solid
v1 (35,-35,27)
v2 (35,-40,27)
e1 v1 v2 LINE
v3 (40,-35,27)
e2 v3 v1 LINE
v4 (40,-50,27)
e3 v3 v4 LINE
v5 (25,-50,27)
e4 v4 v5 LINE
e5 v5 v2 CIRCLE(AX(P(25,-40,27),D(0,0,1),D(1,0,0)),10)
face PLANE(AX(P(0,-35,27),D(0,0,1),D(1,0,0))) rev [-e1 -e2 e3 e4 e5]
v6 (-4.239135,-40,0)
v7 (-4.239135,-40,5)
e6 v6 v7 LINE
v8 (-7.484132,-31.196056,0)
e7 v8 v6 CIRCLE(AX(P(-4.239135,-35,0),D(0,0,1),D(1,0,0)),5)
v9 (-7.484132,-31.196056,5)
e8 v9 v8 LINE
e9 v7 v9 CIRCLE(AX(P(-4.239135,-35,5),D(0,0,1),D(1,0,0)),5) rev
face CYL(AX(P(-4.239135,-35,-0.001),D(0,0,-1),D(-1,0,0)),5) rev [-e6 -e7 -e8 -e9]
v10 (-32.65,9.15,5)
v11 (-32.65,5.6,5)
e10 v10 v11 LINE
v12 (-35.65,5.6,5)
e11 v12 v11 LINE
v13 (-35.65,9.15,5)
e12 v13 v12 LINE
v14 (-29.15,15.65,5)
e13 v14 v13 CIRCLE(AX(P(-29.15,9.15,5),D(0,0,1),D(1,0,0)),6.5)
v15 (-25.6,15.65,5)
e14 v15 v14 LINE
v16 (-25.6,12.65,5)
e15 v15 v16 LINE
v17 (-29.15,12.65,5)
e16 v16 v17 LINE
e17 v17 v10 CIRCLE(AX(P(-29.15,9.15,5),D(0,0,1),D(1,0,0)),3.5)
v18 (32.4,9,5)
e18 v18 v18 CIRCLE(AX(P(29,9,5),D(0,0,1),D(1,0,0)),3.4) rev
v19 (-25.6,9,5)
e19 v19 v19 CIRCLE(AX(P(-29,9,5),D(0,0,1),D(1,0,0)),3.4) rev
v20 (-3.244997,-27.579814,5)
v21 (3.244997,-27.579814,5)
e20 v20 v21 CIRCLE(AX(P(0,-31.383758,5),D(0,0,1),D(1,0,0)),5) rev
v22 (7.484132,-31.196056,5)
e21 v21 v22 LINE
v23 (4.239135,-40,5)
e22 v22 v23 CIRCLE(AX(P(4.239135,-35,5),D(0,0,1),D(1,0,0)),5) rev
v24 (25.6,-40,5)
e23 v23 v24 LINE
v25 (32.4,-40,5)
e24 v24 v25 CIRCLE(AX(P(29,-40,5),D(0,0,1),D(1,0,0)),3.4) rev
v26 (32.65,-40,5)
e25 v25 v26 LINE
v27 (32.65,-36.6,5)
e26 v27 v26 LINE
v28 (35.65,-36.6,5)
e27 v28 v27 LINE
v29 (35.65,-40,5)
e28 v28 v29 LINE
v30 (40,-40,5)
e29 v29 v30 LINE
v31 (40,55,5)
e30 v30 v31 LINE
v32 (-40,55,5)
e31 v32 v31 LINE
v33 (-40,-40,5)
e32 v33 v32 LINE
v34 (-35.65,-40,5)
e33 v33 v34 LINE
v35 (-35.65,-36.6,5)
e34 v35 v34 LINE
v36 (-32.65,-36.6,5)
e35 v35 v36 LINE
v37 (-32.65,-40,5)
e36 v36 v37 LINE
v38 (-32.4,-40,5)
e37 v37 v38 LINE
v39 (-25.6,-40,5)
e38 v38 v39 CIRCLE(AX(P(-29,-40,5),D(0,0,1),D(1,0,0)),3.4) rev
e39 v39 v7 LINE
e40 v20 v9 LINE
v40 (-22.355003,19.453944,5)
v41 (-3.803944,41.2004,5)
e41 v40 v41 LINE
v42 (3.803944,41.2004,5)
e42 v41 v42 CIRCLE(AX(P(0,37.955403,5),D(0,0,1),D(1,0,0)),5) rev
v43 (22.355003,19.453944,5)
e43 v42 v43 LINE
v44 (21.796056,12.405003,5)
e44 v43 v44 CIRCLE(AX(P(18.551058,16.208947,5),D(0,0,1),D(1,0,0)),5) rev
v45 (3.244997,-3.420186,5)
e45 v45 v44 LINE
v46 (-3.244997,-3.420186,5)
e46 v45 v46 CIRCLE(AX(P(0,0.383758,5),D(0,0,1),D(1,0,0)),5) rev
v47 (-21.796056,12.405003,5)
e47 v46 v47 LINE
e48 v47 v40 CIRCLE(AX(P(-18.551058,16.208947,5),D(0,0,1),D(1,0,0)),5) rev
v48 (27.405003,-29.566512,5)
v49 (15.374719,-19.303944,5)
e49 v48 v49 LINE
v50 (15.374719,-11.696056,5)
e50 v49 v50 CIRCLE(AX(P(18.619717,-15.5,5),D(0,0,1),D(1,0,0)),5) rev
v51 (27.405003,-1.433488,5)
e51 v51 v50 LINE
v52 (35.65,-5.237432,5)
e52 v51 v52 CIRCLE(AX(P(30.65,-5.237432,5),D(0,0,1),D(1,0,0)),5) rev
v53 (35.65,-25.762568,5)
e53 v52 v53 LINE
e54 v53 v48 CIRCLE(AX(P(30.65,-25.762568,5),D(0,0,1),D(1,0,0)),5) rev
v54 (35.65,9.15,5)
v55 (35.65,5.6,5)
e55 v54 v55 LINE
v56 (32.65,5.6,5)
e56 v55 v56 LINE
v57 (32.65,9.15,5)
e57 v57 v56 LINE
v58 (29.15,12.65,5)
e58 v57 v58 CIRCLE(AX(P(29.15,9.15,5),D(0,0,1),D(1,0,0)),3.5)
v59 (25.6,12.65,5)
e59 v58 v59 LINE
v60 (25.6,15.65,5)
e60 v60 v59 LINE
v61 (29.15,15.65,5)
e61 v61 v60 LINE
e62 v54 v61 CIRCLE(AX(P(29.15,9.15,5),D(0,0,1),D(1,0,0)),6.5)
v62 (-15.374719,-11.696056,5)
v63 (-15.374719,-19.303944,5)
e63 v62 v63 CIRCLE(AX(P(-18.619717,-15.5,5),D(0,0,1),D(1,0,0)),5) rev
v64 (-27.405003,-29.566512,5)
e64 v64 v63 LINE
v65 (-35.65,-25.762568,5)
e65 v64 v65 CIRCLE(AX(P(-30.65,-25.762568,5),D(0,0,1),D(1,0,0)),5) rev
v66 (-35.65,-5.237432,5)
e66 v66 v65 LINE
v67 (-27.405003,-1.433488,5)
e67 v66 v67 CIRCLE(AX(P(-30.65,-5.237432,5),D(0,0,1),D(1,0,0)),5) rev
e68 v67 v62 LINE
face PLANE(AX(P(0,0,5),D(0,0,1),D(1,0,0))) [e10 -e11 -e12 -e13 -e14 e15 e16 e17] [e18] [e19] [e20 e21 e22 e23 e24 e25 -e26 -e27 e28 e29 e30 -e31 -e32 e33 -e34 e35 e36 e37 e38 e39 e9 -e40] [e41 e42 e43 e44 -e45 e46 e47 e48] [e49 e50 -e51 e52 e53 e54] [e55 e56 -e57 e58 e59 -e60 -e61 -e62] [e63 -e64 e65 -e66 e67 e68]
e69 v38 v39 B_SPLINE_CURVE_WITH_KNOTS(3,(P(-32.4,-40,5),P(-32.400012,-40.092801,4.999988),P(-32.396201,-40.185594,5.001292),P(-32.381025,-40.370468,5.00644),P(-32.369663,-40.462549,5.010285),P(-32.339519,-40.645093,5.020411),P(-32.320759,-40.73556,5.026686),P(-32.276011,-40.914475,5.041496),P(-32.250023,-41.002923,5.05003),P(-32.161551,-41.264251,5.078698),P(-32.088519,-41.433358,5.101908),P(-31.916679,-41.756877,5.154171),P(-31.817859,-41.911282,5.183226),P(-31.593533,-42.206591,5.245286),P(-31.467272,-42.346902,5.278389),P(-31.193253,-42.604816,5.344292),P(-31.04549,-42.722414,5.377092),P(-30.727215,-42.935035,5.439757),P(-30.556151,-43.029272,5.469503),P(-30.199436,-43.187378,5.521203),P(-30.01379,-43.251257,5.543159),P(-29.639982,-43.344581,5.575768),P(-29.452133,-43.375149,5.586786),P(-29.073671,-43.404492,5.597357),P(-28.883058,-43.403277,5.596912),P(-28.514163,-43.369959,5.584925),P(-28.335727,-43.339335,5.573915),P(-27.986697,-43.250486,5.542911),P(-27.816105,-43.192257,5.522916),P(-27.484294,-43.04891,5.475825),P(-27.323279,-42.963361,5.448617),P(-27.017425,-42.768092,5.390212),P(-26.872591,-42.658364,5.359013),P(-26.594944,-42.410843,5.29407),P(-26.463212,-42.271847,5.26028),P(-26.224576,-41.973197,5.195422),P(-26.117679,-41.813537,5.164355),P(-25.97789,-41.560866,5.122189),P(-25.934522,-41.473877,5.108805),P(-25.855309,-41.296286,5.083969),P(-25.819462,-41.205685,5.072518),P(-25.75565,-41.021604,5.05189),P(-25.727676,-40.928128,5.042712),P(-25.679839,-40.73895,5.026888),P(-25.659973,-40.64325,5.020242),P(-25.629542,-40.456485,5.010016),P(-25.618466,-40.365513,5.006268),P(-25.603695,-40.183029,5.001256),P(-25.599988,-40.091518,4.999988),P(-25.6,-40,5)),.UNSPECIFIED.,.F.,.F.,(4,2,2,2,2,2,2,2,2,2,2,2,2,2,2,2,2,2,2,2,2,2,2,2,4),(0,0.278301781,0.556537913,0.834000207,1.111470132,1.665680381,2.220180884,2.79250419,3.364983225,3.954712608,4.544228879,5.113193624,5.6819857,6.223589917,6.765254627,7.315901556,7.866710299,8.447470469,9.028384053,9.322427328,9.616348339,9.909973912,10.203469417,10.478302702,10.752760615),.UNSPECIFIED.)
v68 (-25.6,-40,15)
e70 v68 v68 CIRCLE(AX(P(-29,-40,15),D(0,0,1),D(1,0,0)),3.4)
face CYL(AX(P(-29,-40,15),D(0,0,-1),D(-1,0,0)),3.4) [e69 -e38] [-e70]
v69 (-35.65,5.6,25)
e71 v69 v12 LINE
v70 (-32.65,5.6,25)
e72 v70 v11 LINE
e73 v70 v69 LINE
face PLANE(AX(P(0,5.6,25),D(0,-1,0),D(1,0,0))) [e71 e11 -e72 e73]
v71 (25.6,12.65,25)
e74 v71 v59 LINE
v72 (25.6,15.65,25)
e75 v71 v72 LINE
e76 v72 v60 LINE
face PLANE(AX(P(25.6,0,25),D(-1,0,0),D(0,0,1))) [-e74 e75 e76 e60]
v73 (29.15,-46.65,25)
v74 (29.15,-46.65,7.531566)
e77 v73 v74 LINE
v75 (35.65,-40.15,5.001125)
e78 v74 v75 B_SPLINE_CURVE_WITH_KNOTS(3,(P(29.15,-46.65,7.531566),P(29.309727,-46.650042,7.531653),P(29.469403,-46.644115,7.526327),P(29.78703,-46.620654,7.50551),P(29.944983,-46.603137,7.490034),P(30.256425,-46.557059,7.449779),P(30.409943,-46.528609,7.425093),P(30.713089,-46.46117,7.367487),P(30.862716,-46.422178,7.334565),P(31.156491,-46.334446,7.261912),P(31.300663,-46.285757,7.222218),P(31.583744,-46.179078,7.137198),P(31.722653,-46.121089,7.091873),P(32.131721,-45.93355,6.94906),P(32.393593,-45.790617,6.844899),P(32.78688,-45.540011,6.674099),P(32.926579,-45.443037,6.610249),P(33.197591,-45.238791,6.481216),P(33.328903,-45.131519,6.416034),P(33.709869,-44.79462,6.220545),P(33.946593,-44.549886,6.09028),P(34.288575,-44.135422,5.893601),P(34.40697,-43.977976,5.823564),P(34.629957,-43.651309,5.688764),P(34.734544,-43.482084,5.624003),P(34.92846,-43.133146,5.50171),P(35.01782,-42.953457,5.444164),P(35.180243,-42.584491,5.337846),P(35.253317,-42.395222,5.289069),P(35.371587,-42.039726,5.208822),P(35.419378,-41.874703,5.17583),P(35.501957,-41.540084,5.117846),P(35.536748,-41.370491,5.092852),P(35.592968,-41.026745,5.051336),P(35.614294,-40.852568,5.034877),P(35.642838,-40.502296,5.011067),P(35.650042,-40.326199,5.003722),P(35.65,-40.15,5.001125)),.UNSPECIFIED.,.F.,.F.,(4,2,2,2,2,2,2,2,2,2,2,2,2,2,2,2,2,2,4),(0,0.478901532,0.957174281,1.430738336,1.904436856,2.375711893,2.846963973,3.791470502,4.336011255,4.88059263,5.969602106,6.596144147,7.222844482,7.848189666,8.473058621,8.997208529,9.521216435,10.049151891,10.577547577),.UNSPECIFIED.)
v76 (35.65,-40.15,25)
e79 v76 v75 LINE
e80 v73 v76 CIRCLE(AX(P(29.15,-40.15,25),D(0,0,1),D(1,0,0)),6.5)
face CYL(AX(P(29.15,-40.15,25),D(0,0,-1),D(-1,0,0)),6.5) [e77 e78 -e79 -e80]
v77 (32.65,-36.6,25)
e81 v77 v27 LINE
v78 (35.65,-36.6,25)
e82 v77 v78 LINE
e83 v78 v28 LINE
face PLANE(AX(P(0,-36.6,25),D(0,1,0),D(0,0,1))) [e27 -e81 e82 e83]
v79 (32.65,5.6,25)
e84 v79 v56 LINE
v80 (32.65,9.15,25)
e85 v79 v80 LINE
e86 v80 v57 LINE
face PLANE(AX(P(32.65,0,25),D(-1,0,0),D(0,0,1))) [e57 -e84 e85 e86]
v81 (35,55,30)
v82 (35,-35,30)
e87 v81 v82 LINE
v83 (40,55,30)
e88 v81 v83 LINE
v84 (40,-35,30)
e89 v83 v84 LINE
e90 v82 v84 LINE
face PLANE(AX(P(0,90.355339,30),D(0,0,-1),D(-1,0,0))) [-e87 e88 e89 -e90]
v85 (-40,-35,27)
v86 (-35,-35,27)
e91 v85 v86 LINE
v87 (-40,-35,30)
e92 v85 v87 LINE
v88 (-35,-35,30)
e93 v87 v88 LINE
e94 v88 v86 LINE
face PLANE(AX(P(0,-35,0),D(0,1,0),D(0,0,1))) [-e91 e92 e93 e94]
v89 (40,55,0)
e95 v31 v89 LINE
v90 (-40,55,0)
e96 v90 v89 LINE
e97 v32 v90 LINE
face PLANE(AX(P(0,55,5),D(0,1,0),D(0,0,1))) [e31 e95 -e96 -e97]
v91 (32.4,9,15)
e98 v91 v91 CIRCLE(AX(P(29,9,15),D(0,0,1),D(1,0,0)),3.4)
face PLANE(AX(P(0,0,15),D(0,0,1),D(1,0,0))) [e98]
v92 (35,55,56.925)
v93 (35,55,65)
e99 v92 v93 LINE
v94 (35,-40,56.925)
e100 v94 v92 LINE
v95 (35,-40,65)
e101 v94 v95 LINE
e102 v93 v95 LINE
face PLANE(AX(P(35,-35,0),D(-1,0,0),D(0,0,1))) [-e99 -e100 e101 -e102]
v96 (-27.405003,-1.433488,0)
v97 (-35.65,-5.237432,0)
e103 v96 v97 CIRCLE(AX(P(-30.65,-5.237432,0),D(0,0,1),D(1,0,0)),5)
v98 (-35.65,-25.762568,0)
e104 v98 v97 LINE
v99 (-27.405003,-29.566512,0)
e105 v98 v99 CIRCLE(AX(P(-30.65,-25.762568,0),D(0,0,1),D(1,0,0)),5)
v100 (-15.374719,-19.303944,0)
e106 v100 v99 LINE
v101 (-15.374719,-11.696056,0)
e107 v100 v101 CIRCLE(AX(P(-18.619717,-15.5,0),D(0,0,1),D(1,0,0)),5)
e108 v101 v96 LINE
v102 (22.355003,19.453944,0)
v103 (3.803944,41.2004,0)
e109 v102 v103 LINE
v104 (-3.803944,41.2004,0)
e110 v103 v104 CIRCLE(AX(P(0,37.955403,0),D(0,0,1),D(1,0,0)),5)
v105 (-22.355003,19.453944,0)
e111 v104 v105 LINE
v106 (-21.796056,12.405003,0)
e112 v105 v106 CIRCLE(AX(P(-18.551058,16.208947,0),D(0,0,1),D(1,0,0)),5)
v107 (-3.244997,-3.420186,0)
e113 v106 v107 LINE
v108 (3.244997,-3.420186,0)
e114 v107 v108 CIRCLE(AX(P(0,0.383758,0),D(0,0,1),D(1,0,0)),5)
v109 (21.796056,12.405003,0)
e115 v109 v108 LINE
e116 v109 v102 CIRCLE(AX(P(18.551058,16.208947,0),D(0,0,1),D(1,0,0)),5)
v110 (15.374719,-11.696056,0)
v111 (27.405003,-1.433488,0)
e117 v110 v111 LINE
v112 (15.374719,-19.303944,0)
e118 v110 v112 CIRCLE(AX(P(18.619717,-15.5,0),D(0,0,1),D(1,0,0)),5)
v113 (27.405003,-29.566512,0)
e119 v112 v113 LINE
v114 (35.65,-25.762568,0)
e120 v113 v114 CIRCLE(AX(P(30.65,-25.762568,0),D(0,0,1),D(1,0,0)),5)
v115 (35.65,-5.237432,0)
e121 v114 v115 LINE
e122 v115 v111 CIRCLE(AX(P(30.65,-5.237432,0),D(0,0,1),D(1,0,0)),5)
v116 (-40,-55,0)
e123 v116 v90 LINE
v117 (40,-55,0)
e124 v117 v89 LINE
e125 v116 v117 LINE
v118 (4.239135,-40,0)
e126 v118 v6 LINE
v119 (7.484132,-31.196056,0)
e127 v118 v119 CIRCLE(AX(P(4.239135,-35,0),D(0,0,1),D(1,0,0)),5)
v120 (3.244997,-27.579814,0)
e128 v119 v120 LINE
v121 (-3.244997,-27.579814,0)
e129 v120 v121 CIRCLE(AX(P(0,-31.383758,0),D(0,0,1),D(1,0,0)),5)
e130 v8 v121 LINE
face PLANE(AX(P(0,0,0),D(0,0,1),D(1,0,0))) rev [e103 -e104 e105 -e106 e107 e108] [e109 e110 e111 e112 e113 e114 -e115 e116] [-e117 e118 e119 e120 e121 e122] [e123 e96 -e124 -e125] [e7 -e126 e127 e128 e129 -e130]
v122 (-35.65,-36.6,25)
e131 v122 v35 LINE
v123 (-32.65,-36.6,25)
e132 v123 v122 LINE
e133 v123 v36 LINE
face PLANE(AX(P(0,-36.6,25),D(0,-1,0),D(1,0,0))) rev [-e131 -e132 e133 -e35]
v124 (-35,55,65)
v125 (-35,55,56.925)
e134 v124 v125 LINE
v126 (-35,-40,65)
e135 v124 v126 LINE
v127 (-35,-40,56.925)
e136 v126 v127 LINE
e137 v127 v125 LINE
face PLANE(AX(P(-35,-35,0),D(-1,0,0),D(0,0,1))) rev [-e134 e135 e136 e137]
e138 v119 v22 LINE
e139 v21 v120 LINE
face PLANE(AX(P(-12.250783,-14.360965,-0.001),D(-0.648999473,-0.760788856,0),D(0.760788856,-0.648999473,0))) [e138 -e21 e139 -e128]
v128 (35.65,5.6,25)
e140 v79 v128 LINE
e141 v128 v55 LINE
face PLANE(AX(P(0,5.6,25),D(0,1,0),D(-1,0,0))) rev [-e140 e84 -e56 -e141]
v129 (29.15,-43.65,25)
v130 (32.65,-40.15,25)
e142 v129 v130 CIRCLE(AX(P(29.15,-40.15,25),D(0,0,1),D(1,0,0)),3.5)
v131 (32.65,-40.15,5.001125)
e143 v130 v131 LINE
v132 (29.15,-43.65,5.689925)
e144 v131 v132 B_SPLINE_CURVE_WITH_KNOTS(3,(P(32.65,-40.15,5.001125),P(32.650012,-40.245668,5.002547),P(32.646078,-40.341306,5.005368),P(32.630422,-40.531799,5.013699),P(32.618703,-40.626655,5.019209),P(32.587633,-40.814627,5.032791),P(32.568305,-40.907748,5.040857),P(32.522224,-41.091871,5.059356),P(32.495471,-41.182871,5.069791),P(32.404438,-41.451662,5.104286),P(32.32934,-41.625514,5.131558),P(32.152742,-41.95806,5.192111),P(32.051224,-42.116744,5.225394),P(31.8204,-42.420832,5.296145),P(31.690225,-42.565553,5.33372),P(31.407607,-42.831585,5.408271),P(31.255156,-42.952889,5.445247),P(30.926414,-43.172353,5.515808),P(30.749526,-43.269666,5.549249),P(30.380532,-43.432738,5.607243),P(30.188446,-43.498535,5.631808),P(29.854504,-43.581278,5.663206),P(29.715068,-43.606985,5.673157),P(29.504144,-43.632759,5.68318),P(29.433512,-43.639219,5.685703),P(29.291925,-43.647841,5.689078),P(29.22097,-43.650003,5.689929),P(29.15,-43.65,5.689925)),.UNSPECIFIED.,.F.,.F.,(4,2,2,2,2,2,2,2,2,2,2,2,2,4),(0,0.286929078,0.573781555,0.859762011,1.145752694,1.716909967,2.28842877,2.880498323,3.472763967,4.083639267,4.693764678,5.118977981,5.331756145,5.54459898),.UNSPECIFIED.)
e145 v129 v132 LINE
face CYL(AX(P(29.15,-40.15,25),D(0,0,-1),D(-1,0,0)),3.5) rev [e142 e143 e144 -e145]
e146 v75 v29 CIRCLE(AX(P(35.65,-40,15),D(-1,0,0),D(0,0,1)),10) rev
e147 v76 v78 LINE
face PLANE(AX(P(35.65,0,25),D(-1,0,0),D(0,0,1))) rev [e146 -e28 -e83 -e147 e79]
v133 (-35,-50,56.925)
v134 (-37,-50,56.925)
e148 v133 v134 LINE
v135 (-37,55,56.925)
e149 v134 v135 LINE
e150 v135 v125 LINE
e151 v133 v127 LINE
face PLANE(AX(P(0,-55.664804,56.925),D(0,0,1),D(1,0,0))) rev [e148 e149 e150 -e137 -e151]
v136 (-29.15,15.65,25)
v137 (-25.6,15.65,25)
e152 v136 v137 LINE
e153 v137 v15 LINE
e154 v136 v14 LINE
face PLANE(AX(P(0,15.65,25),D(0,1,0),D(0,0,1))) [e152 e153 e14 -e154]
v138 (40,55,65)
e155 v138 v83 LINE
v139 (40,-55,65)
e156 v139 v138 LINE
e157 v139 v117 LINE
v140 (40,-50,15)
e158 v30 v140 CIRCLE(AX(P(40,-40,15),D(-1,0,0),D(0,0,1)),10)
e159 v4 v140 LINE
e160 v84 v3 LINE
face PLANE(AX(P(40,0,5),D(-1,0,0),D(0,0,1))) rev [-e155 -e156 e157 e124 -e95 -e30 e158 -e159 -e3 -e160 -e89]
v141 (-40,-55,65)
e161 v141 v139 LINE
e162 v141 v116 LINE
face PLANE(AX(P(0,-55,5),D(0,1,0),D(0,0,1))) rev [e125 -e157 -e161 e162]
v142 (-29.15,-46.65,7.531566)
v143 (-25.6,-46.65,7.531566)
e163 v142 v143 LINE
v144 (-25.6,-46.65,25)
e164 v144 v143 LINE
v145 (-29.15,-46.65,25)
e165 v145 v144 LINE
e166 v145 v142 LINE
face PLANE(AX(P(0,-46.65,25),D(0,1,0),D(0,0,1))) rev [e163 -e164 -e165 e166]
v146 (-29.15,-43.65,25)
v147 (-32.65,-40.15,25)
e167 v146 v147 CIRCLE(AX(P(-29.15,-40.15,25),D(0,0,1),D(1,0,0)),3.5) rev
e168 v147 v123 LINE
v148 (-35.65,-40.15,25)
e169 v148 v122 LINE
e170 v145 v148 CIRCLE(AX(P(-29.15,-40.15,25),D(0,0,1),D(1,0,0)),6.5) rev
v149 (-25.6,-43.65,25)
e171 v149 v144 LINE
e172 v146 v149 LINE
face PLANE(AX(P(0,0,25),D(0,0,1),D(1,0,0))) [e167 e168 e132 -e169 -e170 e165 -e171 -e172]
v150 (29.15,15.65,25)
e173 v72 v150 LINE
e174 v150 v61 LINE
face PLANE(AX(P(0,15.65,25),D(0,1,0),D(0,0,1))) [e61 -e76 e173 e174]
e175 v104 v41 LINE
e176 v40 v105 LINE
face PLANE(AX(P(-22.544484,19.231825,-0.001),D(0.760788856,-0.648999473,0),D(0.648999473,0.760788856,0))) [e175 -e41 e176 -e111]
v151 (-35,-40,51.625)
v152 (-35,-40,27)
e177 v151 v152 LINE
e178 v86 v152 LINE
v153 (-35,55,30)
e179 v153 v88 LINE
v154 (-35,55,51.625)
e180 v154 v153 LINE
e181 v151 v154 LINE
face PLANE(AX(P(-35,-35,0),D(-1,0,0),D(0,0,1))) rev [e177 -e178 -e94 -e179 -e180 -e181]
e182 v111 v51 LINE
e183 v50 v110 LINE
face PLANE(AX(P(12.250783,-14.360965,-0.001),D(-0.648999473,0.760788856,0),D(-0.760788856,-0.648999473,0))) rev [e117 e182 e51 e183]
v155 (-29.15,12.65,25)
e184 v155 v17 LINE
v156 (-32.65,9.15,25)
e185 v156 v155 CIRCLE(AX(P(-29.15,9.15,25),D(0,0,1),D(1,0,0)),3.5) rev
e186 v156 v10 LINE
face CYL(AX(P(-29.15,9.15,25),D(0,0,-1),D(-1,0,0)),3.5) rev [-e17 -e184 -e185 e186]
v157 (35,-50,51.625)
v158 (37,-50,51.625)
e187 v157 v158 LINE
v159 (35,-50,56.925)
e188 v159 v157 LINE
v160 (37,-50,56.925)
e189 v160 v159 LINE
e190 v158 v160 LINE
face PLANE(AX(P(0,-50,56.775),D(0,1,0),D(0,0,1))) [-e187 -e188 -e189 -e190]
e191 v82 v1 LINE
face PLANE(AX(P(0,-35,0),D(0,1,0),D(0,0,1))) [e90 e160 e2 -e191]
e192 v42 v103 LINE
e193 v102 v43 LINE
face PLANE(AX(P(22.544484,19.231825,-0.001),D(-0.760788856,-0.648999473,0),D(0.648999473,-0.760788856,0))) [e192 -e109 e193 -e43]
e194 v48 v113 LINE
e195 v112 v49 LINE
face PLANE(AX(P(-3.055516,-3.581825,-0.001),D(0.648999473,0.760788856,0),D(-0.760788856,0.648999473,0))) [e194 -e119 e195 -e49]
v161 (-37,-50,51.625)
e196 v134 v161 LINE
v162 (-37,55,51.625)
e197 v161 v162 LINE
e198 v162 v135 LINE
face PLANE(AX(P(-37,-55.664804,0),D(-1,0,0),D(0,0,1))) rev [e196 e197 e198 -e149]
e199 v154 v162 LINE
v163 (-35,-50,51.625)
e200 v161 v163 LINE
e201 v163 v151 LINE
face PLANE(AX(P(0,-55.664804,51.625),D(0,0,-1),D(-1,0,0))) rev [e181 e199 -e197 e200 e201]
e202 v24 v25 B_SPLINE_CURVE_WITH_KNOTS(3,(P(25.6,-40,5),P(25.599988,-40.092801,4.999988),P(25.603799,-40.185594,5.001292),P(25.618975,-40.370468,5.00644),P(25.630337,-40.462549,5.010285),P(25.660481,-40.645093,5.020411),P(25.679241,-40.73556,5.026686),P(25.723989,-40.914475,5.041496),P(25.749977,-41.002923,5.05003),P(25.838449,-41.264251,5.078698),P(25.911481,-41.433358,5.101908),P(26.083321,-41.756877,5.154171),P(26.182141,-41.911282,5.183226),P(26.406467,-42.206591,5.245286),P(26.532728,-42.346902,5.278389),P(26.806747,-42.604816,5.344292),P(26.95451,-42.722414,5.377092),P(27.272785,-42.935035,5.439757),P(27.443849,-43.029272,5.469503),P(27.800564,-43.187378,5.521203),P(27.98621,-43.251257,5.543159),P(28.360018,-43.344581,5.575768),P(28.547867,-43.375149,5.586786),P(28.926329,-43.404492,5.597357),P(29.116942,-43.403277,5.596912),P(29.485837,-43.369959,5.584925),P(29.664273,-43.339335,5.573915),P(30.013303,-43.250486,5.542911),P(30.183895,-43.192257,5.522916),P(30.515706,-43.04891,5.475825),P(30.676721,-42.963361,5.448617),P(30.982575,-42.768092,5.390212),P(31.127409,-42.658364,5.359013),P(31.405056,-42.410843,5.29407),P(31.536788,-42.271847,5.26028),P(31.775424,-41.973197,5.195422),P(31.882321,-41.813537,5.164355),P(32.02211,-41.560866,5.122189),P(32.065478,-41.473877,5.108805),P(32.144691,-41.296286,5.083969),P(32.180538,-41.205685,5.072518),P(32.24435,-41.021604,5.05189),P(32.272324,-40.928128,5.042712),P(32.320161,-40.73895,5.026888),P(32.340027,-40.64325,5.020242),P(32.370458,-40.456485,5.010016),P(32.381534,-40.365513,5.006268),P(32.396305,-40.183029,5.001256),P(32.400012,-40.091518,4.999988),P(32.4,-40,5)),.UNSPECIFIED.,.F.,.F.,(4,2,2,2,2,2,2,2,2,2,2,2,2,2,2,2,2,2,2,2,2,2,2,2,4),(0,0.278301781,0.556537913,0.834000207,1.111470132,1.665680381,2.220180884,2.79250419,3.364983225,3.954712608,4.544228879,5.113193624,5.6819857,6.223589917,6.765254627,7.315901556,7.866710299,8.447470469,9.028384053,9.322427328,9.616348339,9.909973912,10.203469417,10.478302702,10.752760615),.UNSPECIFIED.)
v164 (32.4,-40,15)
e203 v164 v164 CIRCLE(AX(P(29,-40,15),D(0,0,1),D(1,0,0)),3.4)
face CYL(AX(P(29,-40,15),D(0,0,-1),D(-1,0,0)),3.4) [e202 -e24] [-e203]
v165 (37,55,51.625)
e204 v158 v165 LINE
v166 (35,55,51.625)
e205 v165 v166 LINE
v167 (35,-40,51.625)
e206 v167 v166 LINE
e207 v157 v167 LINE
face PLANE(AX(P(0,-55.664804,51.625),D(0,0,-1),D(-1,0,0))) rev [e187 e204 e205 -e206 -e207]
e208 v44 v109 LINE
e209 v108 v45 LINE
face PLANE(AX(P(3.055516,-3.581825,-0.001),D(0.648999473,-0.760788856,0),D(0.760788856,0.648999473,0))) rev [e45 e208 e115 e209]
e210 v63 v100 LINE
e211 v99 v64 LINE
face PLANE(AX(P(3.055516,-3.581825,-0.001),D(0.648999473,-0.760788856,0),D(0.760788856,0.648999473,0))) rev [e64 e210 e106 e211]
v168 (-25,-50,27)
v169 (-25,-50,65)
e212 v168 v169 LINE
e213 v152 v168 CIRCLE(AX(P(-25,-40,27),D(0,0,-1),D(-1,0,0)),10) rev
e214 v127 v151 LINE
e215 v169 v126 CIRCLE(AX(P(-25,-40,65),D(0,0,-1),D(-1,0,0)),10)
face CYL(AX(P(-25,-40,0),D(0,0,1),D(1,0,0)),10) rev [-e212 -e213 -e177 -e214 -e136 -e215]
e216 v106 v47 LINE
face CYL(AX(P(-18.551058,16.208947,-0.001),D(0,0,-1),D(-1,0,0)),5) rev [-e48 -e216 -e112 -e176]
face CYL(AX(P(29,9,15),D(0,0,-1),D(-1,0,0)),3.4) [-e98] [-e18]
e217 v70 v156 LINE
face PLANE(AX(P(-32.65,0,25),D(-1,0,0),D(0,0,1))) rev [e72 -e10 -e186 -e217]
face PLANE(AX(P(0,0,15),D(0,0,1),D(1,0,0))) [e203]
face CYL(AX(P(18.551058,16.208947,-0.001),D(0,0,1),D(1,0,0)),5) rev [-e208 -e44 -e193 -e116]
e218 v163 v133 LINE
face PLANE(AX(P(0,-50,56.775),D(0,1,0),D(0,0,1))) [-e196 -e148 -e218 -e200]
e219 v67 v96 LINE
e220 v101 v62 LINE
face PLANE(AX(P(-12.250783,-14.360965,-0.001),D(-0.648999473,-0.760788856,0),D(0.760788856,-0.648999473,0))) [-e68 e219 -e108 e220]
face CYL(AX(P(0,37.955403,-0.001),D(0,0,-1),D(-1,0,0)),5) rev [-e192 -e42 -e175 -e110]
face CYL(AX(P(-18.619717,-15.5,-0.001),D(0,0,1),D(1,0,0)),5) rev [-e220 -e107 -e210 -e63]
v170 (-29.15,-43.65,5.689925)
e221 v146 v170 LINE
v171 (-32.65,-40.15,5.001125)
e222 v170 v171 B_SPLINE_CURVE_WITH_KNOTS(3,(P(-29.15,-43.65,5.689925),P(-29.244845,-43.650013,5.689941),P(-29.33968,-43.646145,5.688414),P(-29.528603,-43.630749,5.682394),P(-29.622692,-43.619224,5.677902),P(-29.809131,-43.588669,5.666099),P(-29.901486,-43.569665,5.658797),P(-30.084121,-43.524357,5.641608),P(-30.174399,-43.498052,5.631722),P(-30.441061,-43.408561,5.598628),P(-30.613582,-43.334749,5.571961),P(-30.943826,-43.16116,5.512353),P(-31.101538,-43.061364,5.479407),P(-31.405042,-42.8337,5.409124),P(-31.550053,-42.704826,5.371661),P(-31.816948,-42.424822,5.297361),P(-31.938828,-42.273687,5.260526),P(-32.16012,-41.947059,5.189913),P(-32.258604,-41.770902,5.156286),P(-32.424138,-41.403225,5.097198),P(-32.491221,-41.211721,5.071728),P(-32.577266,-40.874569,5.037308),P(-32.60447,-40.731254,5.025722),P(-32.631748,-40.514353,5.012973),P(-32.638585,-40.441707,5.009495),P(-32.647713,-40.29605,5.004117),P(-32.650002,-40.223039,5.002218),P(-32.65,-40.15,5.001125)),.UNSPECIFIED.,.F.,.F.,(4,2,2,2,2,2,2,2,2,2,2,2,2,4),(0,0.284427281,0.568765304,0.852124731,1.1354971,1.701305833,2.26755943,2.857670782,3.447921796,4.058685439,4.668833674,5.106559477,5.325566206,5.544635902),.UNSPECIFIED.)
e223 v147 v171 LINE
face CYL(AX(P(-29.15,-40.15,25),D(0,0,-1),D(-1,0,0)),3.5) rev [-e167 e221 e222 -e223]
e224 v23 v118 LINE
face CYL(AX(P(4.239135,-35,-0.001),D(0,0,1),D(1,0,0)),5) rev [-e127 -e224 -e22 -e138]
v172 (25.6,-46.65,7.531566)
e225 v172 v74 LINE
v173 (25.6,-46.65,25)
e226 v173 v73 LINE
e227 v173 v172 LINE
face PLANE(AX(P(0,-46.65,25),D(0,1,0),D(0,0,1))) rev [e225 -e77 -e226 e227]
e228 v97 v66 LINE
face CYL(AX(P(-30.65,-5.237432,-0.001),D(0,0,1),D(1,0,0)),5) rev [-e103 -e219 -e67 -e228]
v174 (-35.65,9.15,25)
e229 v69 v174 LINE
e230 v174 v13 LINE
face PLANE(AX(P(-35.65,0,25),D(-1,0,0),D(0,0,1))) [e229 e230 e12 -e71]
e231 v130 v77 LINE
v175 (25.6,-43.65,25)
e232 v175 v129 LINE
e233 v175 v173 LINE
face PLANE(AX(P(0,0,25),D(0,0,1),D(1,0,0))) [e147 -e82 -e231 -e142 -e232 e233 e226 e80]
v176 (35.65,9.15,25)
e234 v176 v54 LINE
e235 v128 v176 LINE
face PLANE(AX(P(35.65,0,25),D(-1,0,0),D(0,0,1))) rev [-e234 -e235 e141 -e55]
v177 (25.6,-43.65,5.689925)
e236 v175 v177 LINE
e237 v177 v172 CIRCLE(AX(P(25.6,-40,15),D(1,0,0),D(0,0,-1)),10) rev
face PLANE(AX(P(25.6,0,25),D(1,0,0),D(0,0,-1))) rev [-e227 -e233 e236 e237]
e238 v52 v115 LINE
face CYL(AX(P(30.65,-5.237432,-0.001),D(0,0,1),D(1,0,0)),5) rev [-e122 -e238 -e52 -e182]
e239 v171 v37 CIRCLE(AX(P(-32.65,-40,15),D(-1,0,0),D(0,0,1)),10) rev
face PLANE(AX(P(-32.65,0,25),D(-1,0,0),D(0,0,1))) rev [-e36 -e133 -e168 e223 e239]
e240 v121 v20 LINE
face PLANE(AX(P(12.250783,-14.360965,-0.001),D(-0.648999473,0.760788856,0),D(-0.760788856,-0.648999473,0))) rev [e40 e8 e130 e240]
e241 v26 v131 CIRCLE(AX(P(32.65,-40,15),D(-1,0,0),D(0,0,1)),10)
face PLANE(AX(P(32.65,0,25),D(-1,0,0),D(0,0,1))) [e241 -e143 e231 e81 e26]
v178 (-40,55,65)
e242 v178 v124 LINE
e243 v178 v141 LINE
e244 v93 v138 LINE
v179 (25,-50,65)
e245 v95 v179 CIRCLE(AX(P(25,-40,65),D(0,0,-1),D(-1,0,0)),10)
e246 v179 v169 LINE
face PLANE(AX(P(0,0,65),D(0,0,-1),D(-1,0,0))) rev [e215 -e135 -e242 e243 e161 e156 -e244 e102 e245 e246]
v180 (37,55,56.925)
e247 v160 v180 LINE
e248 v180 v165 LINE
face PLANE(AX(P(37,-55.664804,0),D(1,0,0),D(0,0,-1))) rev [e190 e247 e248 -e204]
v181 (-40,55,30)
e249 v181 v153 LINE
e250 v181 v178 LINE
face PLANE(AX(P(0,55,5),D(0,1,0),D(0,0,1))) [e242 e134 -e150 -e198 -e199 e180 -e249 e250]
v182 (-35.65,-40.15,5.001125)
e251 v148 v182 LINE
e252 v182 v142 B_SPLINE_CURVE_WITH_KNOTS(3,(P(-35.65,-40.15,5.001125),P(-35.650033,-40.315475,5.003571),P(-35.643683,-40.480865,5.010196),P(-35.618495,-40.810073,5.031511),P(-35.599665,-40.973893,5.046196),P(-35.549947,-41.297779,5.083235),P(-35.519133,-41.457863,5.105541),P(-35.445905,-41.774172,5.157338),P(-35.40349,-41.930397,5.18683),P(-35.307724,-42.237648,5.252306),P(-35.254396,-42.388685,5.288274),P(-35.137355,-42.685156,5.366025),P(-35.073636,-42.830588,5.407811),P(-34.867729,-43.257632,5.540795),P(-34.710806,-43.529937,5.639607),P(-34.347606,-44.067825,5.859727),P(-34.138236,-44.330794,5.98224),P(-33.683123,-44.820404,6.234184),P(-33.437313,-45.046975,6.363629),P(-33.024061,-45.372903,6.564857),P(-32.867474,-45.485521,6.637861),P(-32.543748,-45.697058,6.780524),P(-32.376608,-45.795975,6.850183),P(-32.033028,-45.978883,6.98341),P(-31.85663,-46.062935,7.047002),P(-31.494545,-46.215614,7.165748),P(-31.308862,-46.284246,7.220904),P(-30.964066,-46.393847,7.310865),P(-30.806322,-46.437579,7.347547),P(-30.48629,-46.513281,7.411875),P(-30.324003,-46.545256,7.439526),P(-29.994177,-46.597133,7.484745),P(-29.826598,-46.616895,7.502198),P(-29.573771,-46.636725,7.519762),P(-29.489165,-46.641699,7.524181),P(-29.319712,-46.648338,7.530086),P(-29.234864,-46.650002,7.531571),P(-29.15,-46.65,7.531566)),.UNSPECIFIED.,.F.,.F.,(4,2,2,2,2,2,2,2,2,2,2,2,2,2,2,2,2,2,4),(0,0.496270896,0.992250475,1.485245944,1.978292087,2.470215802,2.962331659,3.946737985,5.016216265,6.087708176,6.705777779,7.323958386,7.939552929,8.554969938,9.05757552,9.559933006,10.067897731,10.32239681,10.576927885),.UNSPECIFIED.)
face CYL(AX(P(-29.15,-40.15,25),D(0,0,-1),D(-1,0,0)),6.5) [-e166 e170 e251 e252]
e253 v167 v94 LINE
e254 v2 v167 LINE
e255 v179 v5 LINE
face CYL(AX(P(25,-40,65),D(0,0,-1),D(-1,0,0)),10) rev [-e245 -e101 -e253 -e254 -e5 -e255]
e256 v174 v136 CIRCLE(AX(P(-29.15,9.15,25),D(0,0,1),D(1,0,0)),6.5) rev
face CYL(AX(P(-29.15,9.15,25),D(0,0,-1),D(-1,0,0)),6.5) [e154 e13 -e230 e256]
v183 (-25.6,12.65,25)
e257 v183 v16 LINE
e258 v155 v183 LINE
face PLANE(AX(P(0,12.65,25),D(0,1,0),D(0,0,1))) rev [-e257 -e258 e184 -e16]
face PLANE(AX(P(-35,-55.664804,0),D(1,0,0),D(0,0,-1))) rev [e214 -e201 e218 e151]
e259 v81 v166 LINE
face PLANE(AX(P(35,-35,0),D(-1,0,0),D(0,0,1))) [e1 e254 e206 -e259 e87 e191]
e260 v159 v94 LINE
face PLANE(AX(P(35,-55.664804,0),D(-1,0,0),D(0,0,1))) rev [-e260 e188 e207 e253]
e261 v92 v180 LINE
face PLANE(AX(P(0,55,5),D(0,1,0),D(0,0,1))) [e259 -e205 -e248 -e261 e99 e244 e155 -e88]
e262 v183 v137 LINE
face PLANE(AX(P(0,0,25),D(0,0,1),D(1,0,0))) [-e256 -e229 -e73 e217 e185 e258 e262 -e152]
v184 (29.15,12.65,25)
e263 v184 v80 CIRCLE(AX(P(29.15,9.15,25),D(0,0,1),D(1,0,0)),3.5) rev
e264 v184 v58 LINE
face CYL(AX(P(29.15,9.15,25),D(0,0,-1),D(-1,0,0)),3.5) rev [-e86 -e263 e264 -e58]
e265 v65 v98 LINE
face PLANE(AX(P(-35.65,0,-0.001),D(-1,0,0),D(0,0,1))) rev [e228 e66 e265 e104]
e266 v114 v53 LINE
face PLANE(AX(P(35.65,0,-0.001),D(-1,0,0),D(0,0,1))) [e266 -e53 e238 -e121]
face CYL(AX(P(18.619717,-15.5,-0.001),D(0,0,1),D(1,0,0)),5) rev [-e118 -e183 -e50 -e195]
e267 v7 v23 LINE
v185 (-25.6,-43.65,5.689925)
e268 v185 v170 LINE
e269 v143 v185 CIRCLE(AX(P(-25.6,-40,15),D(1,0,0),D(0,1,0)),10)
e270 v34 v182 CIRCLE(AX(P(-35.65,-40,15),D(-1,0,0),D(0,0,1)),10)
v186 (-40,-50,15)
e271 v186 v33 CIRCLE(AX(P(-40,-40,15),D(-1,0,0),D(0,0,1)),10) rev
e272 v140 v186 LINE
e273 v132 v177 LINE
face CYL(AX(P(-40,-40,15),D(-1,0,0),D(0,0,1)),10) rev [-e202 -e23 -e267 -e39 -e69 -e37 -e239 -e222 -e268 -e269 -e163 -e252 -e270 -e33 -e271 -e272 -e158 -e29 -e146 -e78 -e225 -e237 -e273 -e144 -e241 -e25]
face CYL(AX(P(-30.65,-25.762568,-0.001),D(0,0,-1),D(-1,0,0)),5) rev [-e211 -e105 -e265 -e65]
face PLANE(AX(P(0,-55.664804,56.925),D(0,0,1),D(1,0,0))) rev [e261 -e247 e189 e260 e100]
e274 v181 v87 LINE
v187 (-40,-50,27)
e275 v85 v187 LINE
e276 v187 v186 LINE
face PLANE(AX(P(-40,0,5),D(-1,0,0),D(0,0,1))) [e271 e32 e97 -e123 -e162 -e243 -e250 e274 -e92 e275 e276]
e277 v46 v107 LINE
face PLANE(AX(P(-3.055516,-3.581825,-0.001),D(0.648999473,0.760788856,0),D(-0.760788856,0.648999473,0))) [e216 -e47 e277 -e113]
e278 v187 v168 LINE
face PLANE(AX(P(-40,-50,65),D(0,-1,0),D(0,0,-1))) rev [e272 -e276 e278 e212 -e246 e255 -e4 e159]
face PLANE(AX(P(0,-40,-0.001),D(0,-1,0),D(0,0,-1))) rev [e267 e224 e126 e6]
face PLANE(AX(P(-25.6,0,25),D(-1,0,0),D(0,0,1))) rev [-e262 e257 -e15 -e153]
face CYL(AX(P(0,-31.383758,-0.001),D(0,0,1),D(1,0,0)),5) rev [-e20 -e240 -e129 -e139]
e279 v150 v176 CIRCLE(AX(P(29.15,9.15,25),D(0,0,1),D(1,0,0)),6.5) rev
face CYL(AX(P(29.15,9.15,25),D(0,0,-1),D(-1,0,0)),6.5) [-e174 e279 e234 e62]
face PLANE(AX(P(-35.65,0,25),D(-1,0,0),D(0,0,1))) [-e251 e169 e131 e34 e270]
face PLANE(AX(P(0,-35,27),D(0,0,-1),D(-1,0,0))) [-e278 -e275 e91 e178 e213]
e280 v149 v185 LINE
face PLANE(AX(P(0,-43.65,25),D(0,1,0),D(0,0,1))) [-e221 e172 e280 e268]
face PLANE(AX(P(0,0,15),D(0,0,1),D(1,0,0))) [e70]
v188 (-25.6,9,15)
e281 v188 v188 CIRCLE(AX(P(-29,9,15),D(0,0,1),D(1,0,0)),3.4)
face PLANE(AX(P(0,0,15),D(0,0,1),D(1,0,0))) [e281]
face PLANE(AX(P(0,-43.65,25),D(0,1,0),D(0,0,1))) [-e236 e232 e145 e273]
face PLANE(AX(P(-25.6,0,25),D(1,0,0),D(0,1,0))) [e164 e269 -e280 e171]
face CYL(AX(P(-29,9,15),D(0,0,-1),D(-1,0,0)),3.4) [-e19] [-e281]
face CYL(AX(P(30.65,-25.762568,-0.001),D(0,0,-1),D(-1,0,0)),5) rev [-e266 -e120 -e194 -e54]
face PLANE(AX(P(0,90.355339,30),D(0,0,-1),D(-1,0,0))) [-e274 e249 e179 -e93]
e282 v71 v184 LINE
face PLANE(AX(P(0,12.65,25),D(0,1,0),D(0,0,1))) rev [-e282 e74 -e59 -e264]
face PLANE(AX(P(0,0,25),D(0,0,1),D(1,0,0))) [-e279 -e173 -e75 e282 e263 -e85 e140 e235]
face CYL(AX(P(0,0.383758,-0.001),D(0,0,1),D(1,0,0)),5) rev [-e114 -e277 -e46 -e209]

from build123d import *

# Parameters (mm, degrees)
SKETCH1_W           = 80
SKETCH1_H           = 110
BOSS_EXTRUDE1_DEPTH = 5
SKETCH1_3_R         = 3.4
BOSS_EXTRUDE3_DEPTH = 15
BOSS_EXTRUDE4_DEPTH = 25
SKETCH2_W           = 80
SKETCH2_H           = 5
BOSS_EXTRUDE5_DEPTH = 60
SKETCH3_W           = 5
SKETCH3_H           = 38
BOSS_EXTRUDE6_DEPTH = 15
SKETCH4_W           = 5
SKETCH4_H           = 35
BOSS_EXTRUDE7_DEPTH = 90
FILLET1_R           = 10
CUT_EXTRUDE1_START  = -105
SKETCH5_W           = 2
SKETCH5_H           = 5.3
CUT_EXTRUDE1_DEPTH  = 105
CUT_EXTRUDE2_REACH  = 92.692
FILLET2_R           = 5


with BuildPart() as part:
    # Sketch1 → Boss-Extrude1 (new body)
    with BuildSketch(Plane.XY):
        Rectangle(SKETCH1_W, SKETCH1_H)
    extrude(amount=BOSS_EXTRUDE1_DEPTH)

    # Sketch1<3> → Boss-Extrude3 (add)
    with BuildSketch(Plane.XY):
        with Locations((-29, 9)):
            Circle(SKETCH1_3_R)
        with Locations((29, 9)):
            Circle(SKETCH1_3_R)
        with Locations((29, -40)):
            Circle(SKETCH1_3_R)
        with Locations((-29, -40)):
            Circle(SKETCH1_3_R)
    extrude(amount=BOSS_EXTRUDE3_DEPTH)

    # Sketch1<4> → Boss-Extrude4 (add)
    with BuildSketch(Plane.XY):
        with BuildLine():
            Line((-25.6, 15.65), (-29.15, 15.65))
            ThreePointArc((-29.15, 15.65), (-33.746194078, 13.746194078), (-35.65, 9.15))
            Line((-35.65, 9.15), (-35.65, 5.6))
            Line((-35.65, 5.6), (-32.65, 5.6))
            Line((-32.65, 5.6), (-32.65, 9.15))
            ThreePointArc((-32.65, 9.15), (-31.624873734, 11.624873734), (-29.15, 12.65))
            Line((-29.15, 12.65), (-25.6, 12.65))
            Line((-25.6, 12.65), (-25.6, 15.65))
        make_face()
        with BuildLine():
            Line((29.15, 15.65), (25.6, 15.65))
            Line((25.6, 15.65), (25.6, 12.65))
            Line((25.6, 12.65), (29.15, 12.65))
            ThreePointArc((29.15, 12.65), (31.624873734, 11.624873734), (32.65, 9.15))
            Line((32.65, 9.15), (32.65, 5.6))
            Line((32.65, 5.6), (35.65, 5.6))
            Line((35.65, 5.6), (35.65, 9.15))
            ThreePointArc((35.65, 9.15), (33.746194078, 13.746194078), (29.15, 15.65))
        make_face()
        with BuildLine():
            Line((35.65, -40.15), (35.65, -36.6))
            Line((35.65, -36.6), (32.65, -36.6))
            Line((32.65, -36.6), (32.65, -40.15))
            ThreePointArc((32.65, -40.15), (31.624873734, -42.624873734), (29.15, -43.65))
            Line((29.15, -43.65), (25.6, -43.65))
            Line((25.6, -43.65), (25.6, -46.65))
            Line((25.6, -46.65), (29.15, -46.65))
            ThreePointArc((29.15, -46.65), (33.746194078, -44.746194078), (35.65, -40.15))
        make_face()
        with BuildLine():
            Line((-32.65, -36.6), (-35.65, -36.6))
            Line((-35.65, -36.6), (-35.65, -40.15))
            ThreePointArc((-35.65, -40.15), (-33.746194078, -44.746194078), (-29.15, -46.65))
            Line((-29.15, -46.65), (-25.6, -46.65))
            Line((-25.6, -46.65), (-25.6, -43.65))
            Line((-25.6, -43.65), (-29.15, -43.65))
            ThreePointArc((-29.15, -43.65), (-31.624873734, -42.624873734), (-32.65, -40.15))
            Line((-32.65, -40.15), (-32.65, -36.6))
        make_face()
    extrude(amount=BOSS_EXTRUDE4_DEPTH)

    # Sketch2 → Boss-Extrude5 (add)
    with BuildSketch(Plane.XY.offset(5)):
        with Locations((0, -52.5)):
            Rectangle(SKETCH2_W, SKETCH2_H)
    extrude(amount=BOSS_EXTRUDE5_DEPTH)

    # Sketch3 → Boss-Extrude6 (add)
    with BuildSketch(Plane(origin=(0, -50, 0), x_dir=(1, 0, 0), z_dir=(0, 1, 0))):
        with Locations((-37.5, -46)):
            Rectangle(SKETCH3_W, SKETCH3_H)
        with Locations((37.5, -46)):
            Rectangle(SKETCH3_W, SKETCH3_H)
    extrude(amount=BOSS_EXTRUDE6_DEPTH)

    # Sketch4 → Boss-Extrude7 (add)
    with BuildSketch(Plane(origin=(0, -35, 0), x_dir=(1, 0, 0), z_dir=(0, 1, 0))):
        with Locations((-37.5, -47.5)):
            Rectangle(SKETCH4_W, SKETCH4_H)
        with Locations((37.5, -47.5)):
            Rectangle(SKETCH4_W, SKETCH4_H)
    extrude(amount=BOSS_EXTRUDE7_DEPTH)

    # Fillet1
    # the kernel refuses this fillet: 10 mm, written as the material it adds along each edge
    with BuildSketch(Plane(origin=(-35, -50, 65), x_dir=(1, 0, 0), z_dir=(0, 0, -1)), Plane(origin=(35, -50, 27), x_dir=(-1, 0, 0), z_dir=(0, 0, 1))) as fillet1_piece_1:
        with BuildLine():
            CenterArc((FILLET1_R, -FILLET1_R), FILLET1_R, 90, 90)
            Line((0, -FILLET1_R), (0, 0))
            Line((0, 0), (FILLET1_R, 0))
        make_face()
    extrude(amount=38)
    with BuildSketch(Plane(origin=(40, -50, 5), x_dir=(0, 1, 0), z_dir=(-1, 0, 0))) as fillet1_piece_2:
        with BuildLine():
            CenterArc((FILLET1_R, -FILLET1_R), FILLET1_R, 90, 90)
            Line((0, -FILLET1_R), (0, 0))
            Line((0, 0), (FILLET1_R, 0))
        make_face()
    extrude(amount=80)

    # Sketch5 → Cut-Extrude1 (cut)
    with BuildSketch(Plane(origin=(0, 55, 0), x_dir=(1, 0, 0), z_dir=(0, 1, 0)).offset(CUT_EXTRUDE1_START)):
        with Locations((-36, -54.275)):
            Rectangle(SKETCH5_W, SKETCH5_H)
        with Locations((36, -54.275)):
            Rectangle(SKETCH5_W, SKETCH5_H)
    extrude(amount=CUT_EXTRUDE1_DEPTH, mode=Mode.SUBTRACT)

    # Sketch6 → Cut-Extrude2 (cut, up to next)
    with BuildSketch(Plane.XY.offset(5), mode=Mode.PRIVATE) as cut_extrude2_sk1:
        Polygon((0, 45.659569378), (25.6, 15.65), (-25.6, 15.65), align=None)
    cut_extrude2_tool1 = extrude(cut_extrude2_sk1.sketch, amount=-CUT_EXTRUDE2_REACH, mode=Mode.PRIVATE) & part.part
    # Sketch6 → Cut-Extrude2 (cut, up to next)
    with BuildSketch(Plane.XY.offset(5), mode=Mode.PRIVATE) as cut_extrude2_sk2:
        Polygon((-25.6, 15.65), (0, -6.188367347), (25.6, 15.65), align=None)
    cut_extrude2_tool2 = extrude(cut_extrude2_sk2.sketch, amount=-CUT_EXTRUDE2_REACH, mode=Mode.PRIVATE) & part.part
    # Sketch6 → Cut-Extrude2 (cut, up to next)
    with BuildSketch(Plane.XY.offset(5), mode=Mode.PRIVATE) as cut_extrude2_sk3:
        Polygon((-35.65, -36.6), (-10.915550239, -15.5), (-35.65, 5.6), align=None)
    cut_extrude2_tool3 = extrude(cut_extrude2_sk3.sketch, amount=-CUT_EXTRUDE2_REACH, mode=Mode.PRIVATE) & part.part
    # Sketch6 → Cut-Extrude2 (cut, up to next)
    with BuildSketch(Plane.XY.offset(5), mode=Mode.PRIVATE) as cut_extrude2_sk4:
        Polygon((-17.804545455, -40), (17.804545455, -40), (0, -24.811632653), align=None)
    cut_extrude2_tool4 = extrude(cut_extrude2_sk4.sketch, amount=-CUT_EXTRUDE2_REACH, mode=Mode.PRIVATE) & part.part
    # Sketch6 → Cut-Extrude2 (cut, up to next)
    with BuildSketch(Plane.XY.offset(5), mode=Mode.PRIVATE) as cut_extrude2_sk5:
        Polygon((10.915550239, -15.5), (35.65, -36.6), (35.65, 5.6), align=None)
    cut_extrude2_tool5 = extrude(cut_extrude2_sk5.sketch, amount=-CUT_EXTRUDE2_REACH, mode=Mode.PRIVATE) & part.part
    add(cut_extrude2_tool1.solids().sort_by_distance((0, 25.65319, 5))[0], mode=Mode.SUBTRACT)
    add(cut_extrude2_tool2.solids().sort_by_distance((0, 8.370544, 5))[0], mode=Mode.SUBTRACT)
    add(cut_extrude2_tool3.solids().sort_by_distance((-27.405183, -15.5, 5))[0], mode=Mode.SUBTRACT)
    add(cut_extrude2_tool4.solids().sort_by_distance((0, -34.937211, 5))[0], mode=Mode.SUBTRACT)
    add(cut_extrude2_tool5.solids().sort_by_distance((27.405183, -15.5, 5))[0], mode=Mode.SUBTRACT)

    # Fillet2
    # the kernel refuses this fillet: 5 mm, written as the material it adds along each edge
    with BuildSketch(Plane(origin=(17.804545455, -40, 5), x_dir=(-1, 0, 0), z_dir=(0, 0, -1))) as fillet2_piece_1:
        with BuildLine():
            CenterArc((FILLET2_R * 2.71308210373, FILLET2_R), FILLET2_R, 130.466208854, 139.533791146)
            Line((FILLET2_R * 2.06408263048, FILLET2_R * 1.7607888562), (0, 0))
            Line((0, 0), (FILLET2_R * 2.71308210373, 0))
        make_face()
    extrude(amount=5)
    with BuildSketch(Plane(origin=(0, -24.811632653, 5), x_dir=(0.7607888562020934, -0.6489994732499483, 0), z_dir=(0, 0, -1)), Plane(origin=(0, -6.188367347, 5), x_dir=(-0.7607888562020926, 0.6489994732499494, 0), z_dir=(0, 0, -1))) as fillet2_piece_2:
        with BuildLine():
            CenterArc((FILLET2_R * 0.85306122449, FILLET2_R), FILLET2_R, 189.067582292, 80.932417708)
            Line((-FILLET2_R * 0.134441909369, FILLET2_R * 0.842400632557), (0, 0))
            Line((0, 0), (FILLET2_R * 0.85306122449, 0))
        make_face()
    extrude(amount=5)
    with BuildSketch(Plane(origin=(-17.804545455, -40, 5), x_dir=(1, 0, 0), z_dir=(0, 0, -1))) as fillet2_piece_3:
        with BuildLine():
            CenterArc((FILLET2_R * 2.71308210373, -FILLET2_R), FILLET2_R, 90, 139.533791146)
            Line((FILLET2_R * 2.06408263048, -FILLET2_R * 1.7607888562), (0, 0))
            Line((0, 0), (FILLET2_R * 2.71308210373, 0))
        make_face()
    extrude(amount=5)
    with BuildSketch(Plane(origin=(-35.65, 5.6, 5), x_dir=(0, -1, 0), z_dir=(0, 0, -1)), Plane(origin=(35.65, -36.6, 5), x_dir=(0, 1, 0), z_dir=(0, 0, -1))) as fillet2_piece_4:
        with BuildLine():
            CenterArc((FILLET2_R * 2.16748636604, -FILLET2_R), FILLET2_R, 90, 130.466208854)
            Line((FILLET2_R * 1.40669750983, -FILLET2_R * 1.64899947325), (0, 0))
            Line((0, 0), (FILLET2_R * 2.16748636604, 0))
        make_face()
    extrude(amount=5)
    with BuildSketch(Plane(origin=(-10.915550239, -15.5, 5), x_dir=(-0.7607888562020928, -0.6489994732499492, 0), z_dir=(0, 0, -1)), Plane(origin=(10.915550239, -15.5, 5), x_dir=(0.760788856202093, 0.648999473249949, 0), z_dir=(0, 0, -1)), Plane(origin=(0, 45.659569378, 5), x_dir=(0.6489994732499487, -0.7607888562020931, 0), z_dir=(0, 0, -1))) as fillet2_piece_5:
        with BuildLine():
            CenterArc((FILLET2_R * 1.17224880383, FILLET2_R), FILLET2_R, 170.932417708, 99.067582292)
            Line((FILLET2_R * 0.184745669969, FILLET2_R * 1.15759936744), (0, 0))
            Line((0, 0), (FILLET2_R * 1.17224880383, 0))
        make_face()
    extrude(amount=5)
    with BuildSketch(Plane(origin=(-35.65, -36.6, 5), x_dir=(0, 1, 0), z_dir=(0, 0, -1)), Plane(origin=(35.65, 5.6, 5), x_dir=(0, -1, 0), z_dir=(0, 0, -1))) as fillet2_piece_6:
        with BuildLine():
            CenterArc((FILLET2_R * 2.16748636604, FILLET2_R), FILLET2_R, 139.533791146, 130.466208854)
            Line((FILLET2_R * 1.40669750983, FILLET2_R * 1.64899947325), (0, 0))
            Line((0, 0), (FILLET2_R * 2.16748636604, 0))
        make_face()
    extrude(amount=5)
    with BuildSketch(Plane(origin=(25.6, 15.65, 5), x_dir=(-0.6489994732499493, 0.7607888562020927, 0), z_dir=(0, 0, -1))) as fillet2_piece_7:
        with BuildLine():
            CenterArc((FILLET2_R, -FILLET2_R), FILLET2_R, 90, 90)
            Line((0, -FILLET2_R), (0, 0))
            Line((0, 0), (FILLET2_R, 0))
        make_face()
    extrude(amount=5)
    with BuildSketch(Plane(origin=(-25.6, 15.65, 5), x_dir=(0.648999473249949, 0.7607888562020928, 0), z_dir=(0, 0, -1))) as fillet2_piece_8:
        with BuildLine():
            CenterArc((FILLET2_R, FILLET2_R), FILLET2_R, 180, 90)
            Line((0, FILLET2_R), (0, 0))
            Line((0, 0), (FILLET2_R, 0))
        make_face()
    extrude(amount=5)


solid = part.part
